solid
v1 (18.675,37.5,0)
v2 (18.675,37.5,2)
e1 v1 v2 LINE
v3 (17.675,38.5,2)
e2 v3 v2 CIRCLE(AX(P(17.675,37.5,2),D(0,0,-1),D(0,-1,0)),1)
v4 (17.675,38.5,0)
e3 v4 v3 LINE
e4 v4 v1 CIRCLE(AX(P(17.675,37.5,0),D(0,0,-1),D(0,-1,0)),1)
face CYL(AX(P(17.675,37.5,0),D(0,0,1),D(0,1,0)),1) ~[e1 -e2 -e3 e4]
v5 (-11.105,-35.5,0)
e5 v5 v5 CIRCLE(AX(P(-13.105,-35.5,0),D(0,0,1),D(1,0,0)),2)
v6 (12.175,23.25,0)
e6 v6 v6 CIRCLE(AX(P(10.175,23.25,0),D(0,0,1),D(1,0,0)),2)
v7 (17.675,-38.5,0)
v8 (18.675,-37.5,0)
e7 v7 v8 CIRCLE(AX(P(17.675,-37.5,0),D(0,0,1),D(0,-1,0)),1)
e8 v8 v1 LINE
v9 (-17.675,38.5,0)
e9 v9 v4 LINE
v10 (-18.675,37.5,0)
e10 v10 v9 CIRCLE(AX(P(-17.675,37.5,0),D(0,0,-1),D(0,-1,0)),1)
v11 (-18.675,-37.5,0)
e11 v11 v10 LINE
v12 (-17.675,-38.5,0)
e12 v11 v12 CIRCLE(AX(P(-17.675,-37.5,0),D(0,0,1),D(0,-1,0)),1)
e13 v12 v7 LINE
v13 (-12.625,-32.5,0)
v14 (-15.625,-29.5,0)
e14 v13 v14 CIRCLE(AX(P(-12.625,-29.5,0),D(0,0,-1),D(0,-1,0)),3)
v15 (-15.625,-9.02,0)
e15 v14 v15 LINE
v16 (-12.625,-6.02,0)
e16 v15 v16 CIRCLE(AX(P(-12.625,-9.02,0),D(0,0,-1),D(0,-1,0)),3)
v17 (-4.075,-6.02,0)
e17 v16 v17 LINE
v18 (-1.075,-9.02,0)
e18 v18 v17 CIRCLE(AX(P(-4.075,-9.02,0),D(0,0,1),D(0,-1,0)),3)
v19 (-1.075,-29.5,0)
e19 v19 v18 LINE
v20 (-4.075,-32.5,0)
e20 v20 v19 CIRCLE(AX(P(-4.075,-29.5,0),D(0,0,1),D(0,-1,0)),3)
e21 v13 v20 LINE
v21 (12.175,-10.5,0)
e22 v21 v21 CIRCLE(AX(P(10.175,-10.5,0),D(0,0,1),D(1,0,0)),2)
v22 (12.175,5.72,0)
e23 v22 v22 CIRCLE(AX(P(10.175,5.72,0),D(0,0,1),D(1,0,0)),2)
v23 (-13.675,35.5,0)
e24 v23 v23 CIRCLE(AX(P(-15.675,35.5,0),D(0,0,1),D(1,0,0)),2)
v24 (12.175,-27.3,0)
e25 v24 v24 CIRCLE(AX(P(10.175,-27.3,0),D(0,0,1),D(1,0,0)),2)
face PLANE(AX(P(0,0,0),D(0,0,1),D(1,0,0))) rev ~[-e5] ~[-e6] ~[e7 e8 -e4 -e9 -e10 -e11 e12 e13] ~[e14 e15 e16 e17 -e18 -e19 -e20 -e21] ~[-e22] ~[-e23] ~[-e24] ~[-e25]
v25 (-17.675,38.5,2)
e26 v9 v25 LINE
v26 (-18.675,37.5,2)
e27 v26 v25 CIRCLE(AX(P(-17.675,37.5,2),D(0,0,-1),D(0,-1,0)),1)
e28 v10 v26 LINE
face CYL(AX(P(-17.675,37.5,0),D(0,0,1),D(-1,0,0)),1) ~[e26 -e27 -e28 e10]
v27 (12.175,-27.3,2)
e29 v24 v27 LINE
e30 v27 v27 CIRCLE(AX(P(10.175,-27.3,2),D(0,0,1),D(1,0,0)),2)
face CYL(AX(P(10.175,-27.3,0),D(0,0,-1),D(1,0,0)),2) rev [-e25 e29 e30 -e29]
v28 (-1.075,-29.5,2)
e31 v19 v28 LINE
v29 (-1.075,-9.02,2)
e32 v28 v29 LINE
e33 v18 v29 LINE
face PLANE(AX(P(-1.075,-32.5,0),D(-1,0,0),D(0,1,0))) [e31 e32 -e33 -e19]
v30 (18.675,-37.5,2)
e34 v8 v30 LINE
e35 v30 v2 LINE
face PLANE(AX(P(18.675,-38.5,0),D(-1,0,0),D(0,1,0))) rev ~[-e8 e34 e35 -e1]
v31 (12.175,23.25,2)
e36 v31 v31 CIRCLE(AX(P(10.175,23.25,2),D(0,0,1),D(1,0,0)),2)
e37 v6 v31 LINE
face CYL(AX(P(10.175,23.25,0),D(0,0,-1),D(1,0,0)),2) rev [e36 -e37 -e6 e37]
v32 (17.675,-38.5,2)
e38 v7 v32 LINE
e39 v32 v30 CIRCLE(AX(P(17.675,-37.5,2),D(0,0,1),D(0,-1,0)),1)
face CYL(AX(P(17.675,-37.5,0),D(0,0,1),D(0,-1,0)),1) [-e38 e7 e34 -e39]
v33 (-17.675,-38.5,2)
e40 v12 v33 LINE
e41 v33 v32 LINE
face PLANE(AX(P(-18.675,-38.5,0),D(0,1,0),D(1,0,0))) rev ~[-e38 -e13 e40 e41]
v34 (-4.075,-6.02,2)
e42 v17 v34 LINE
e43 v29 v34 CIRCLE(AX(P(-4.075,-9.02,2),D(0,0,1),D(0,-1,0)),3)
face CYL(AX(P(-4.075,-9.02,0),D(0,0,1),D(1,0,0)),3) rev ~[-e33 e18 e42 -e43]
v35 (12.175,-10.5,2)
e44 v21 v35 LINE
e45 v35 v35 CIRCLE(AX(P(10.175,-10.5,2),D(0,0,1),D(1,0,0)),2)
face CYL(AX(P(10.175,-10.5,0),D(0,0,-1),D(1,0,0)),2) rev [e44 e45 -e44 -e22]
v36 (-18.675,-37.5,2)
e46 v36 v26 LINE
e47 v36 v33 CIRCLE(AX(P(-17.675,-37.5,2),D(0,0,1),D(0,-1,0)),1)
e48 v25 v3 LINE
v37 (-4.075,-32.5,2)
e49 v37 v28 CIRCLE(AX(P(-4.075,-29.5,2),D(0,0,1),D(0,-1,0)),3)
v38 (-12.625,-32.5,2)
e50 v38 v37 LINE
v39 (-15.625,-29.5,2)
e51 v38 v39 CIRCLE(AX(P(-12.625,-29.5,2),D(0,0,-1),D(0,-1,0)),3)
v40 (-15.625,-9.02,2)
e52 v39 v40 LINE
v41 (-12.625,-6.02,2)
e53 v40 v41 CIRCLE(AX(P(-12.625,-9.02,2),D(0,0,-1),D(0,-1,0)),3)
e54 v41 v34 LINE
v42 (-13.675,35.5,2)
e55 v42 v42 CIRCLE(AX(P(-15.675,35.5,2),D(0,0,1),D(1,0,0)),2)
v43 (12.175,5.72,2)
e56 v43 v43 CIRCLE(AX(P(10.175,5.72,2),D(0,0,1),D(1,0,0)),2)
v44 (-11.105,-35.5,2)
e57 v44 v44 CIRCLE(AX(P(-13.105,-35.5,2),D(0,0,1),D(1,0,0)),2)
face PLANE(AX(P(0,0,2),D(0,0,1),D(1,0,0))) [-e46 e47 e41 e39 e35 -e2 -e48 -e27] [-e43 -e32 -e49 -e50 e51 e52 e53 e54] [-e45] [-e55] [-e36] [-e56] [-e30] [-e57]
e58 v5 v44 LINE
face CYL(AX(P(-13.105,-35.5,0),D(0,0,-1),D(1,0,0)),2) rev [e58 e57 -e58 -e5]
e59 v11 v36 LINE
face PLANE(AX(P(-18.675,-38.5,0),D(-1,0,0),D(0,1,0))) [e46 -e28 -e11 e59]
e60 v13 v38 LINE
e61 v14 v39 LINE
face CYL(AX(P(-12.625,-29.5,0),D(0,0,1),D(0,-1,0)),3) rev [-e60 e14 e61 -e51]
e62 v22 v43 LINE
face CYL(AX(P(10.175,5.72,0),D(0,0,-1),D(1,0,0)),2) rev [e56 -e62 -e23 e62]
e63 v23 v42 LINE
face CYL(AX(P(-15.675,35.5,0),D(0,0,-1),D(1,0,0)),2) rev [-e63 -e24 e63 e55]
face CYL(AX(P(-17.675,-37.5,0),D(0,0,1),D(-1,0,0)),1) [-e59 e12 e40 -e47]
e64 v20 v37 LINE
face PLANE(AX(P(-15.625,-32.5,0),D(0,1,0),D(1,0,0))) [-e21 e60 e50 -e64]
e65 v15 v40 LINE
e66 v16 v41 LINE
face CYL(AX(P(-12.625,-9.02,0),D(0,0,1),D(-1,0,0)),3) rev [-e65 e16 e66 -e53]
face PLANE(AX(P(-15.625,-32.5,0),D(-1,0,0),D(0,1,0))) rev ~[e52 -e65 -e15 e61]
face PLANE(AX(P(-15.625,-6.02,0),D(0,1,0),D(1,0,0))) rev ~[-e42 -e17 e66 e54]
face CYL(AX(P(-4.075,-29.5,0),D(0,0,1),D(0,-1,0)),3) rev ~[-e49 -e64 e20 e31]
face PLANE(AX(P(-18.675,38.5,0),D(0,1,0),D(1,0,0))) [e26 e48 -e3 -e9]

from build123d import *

# Parameters (mm, degrees)
F0_W     = 37.35
F0_H     = 77
F0_R     = 2
F0_W_2   = 14.55
F0_H_2   = 26.48
F1_DEPTH = 2
F2_R     = 3
F3_R     = 1


# Not quite as in the source:
# - a feature of the source that left no trace in its solid (it failed there, or was rolled back) is left out


with BuildPart() as f1:
    # F0 (on Top) → F1 (new body)
    with BuildSketch(Plane.XY):
        Rectangle(F0_W, F0_H)
        with Locations((-13.105, -35.5)):
            Circle(F0_R, mode=Mode.SUBTRACT)
        with Locations((-8.35, -19.26)):
            Rectangle(F0_W_2, F0_H_2, mode=Mode.SUBTRACT)
        with Locations((10.175, -27.3)):
            Circle(F0_R, mode=Mode.SUBTRACT)
        with Locations((10.175, -10.5)):
            Circle(F0_R, mode=Mode.SUBTRACT)
        with Locations((-15.675, 35.5)):
            Circle(F0_R, mode=Mode.SUBTRACT)
        with Locations((10.175, 5.72)):
            Circle(F0_R, mode=Mode.SUBTRACT)
        with Locations((10.175, 23.25)):
            Circle(F0_R, mode=Mode.SUBTRACT)
    extrude(amount=F1_DEPTH)

    # F2
    f2_edges = [f1.edges().sort_by_distance(p)[0] for p in [
        (-1.075, -6.02, 1),
        (-1.075, -32.5, 1),
        (-15.625, -32.5, 1),
        (-15.625, -6.02, 1),
    ]]
    fillet(f2_edges, radius=F2_R)

    # F3
    f3_edges = [f1.edges().sort_by_distance(p)[0] for p in [
        (-18.675, -38.5, 1),
        (18.675, -38.5, 1),
        (18.675, 38.5, 1),
        (-18.675, 38.5, 1),
    ]]
    fillet(f3_edges, radius=F3_R)


solid = f1.part
